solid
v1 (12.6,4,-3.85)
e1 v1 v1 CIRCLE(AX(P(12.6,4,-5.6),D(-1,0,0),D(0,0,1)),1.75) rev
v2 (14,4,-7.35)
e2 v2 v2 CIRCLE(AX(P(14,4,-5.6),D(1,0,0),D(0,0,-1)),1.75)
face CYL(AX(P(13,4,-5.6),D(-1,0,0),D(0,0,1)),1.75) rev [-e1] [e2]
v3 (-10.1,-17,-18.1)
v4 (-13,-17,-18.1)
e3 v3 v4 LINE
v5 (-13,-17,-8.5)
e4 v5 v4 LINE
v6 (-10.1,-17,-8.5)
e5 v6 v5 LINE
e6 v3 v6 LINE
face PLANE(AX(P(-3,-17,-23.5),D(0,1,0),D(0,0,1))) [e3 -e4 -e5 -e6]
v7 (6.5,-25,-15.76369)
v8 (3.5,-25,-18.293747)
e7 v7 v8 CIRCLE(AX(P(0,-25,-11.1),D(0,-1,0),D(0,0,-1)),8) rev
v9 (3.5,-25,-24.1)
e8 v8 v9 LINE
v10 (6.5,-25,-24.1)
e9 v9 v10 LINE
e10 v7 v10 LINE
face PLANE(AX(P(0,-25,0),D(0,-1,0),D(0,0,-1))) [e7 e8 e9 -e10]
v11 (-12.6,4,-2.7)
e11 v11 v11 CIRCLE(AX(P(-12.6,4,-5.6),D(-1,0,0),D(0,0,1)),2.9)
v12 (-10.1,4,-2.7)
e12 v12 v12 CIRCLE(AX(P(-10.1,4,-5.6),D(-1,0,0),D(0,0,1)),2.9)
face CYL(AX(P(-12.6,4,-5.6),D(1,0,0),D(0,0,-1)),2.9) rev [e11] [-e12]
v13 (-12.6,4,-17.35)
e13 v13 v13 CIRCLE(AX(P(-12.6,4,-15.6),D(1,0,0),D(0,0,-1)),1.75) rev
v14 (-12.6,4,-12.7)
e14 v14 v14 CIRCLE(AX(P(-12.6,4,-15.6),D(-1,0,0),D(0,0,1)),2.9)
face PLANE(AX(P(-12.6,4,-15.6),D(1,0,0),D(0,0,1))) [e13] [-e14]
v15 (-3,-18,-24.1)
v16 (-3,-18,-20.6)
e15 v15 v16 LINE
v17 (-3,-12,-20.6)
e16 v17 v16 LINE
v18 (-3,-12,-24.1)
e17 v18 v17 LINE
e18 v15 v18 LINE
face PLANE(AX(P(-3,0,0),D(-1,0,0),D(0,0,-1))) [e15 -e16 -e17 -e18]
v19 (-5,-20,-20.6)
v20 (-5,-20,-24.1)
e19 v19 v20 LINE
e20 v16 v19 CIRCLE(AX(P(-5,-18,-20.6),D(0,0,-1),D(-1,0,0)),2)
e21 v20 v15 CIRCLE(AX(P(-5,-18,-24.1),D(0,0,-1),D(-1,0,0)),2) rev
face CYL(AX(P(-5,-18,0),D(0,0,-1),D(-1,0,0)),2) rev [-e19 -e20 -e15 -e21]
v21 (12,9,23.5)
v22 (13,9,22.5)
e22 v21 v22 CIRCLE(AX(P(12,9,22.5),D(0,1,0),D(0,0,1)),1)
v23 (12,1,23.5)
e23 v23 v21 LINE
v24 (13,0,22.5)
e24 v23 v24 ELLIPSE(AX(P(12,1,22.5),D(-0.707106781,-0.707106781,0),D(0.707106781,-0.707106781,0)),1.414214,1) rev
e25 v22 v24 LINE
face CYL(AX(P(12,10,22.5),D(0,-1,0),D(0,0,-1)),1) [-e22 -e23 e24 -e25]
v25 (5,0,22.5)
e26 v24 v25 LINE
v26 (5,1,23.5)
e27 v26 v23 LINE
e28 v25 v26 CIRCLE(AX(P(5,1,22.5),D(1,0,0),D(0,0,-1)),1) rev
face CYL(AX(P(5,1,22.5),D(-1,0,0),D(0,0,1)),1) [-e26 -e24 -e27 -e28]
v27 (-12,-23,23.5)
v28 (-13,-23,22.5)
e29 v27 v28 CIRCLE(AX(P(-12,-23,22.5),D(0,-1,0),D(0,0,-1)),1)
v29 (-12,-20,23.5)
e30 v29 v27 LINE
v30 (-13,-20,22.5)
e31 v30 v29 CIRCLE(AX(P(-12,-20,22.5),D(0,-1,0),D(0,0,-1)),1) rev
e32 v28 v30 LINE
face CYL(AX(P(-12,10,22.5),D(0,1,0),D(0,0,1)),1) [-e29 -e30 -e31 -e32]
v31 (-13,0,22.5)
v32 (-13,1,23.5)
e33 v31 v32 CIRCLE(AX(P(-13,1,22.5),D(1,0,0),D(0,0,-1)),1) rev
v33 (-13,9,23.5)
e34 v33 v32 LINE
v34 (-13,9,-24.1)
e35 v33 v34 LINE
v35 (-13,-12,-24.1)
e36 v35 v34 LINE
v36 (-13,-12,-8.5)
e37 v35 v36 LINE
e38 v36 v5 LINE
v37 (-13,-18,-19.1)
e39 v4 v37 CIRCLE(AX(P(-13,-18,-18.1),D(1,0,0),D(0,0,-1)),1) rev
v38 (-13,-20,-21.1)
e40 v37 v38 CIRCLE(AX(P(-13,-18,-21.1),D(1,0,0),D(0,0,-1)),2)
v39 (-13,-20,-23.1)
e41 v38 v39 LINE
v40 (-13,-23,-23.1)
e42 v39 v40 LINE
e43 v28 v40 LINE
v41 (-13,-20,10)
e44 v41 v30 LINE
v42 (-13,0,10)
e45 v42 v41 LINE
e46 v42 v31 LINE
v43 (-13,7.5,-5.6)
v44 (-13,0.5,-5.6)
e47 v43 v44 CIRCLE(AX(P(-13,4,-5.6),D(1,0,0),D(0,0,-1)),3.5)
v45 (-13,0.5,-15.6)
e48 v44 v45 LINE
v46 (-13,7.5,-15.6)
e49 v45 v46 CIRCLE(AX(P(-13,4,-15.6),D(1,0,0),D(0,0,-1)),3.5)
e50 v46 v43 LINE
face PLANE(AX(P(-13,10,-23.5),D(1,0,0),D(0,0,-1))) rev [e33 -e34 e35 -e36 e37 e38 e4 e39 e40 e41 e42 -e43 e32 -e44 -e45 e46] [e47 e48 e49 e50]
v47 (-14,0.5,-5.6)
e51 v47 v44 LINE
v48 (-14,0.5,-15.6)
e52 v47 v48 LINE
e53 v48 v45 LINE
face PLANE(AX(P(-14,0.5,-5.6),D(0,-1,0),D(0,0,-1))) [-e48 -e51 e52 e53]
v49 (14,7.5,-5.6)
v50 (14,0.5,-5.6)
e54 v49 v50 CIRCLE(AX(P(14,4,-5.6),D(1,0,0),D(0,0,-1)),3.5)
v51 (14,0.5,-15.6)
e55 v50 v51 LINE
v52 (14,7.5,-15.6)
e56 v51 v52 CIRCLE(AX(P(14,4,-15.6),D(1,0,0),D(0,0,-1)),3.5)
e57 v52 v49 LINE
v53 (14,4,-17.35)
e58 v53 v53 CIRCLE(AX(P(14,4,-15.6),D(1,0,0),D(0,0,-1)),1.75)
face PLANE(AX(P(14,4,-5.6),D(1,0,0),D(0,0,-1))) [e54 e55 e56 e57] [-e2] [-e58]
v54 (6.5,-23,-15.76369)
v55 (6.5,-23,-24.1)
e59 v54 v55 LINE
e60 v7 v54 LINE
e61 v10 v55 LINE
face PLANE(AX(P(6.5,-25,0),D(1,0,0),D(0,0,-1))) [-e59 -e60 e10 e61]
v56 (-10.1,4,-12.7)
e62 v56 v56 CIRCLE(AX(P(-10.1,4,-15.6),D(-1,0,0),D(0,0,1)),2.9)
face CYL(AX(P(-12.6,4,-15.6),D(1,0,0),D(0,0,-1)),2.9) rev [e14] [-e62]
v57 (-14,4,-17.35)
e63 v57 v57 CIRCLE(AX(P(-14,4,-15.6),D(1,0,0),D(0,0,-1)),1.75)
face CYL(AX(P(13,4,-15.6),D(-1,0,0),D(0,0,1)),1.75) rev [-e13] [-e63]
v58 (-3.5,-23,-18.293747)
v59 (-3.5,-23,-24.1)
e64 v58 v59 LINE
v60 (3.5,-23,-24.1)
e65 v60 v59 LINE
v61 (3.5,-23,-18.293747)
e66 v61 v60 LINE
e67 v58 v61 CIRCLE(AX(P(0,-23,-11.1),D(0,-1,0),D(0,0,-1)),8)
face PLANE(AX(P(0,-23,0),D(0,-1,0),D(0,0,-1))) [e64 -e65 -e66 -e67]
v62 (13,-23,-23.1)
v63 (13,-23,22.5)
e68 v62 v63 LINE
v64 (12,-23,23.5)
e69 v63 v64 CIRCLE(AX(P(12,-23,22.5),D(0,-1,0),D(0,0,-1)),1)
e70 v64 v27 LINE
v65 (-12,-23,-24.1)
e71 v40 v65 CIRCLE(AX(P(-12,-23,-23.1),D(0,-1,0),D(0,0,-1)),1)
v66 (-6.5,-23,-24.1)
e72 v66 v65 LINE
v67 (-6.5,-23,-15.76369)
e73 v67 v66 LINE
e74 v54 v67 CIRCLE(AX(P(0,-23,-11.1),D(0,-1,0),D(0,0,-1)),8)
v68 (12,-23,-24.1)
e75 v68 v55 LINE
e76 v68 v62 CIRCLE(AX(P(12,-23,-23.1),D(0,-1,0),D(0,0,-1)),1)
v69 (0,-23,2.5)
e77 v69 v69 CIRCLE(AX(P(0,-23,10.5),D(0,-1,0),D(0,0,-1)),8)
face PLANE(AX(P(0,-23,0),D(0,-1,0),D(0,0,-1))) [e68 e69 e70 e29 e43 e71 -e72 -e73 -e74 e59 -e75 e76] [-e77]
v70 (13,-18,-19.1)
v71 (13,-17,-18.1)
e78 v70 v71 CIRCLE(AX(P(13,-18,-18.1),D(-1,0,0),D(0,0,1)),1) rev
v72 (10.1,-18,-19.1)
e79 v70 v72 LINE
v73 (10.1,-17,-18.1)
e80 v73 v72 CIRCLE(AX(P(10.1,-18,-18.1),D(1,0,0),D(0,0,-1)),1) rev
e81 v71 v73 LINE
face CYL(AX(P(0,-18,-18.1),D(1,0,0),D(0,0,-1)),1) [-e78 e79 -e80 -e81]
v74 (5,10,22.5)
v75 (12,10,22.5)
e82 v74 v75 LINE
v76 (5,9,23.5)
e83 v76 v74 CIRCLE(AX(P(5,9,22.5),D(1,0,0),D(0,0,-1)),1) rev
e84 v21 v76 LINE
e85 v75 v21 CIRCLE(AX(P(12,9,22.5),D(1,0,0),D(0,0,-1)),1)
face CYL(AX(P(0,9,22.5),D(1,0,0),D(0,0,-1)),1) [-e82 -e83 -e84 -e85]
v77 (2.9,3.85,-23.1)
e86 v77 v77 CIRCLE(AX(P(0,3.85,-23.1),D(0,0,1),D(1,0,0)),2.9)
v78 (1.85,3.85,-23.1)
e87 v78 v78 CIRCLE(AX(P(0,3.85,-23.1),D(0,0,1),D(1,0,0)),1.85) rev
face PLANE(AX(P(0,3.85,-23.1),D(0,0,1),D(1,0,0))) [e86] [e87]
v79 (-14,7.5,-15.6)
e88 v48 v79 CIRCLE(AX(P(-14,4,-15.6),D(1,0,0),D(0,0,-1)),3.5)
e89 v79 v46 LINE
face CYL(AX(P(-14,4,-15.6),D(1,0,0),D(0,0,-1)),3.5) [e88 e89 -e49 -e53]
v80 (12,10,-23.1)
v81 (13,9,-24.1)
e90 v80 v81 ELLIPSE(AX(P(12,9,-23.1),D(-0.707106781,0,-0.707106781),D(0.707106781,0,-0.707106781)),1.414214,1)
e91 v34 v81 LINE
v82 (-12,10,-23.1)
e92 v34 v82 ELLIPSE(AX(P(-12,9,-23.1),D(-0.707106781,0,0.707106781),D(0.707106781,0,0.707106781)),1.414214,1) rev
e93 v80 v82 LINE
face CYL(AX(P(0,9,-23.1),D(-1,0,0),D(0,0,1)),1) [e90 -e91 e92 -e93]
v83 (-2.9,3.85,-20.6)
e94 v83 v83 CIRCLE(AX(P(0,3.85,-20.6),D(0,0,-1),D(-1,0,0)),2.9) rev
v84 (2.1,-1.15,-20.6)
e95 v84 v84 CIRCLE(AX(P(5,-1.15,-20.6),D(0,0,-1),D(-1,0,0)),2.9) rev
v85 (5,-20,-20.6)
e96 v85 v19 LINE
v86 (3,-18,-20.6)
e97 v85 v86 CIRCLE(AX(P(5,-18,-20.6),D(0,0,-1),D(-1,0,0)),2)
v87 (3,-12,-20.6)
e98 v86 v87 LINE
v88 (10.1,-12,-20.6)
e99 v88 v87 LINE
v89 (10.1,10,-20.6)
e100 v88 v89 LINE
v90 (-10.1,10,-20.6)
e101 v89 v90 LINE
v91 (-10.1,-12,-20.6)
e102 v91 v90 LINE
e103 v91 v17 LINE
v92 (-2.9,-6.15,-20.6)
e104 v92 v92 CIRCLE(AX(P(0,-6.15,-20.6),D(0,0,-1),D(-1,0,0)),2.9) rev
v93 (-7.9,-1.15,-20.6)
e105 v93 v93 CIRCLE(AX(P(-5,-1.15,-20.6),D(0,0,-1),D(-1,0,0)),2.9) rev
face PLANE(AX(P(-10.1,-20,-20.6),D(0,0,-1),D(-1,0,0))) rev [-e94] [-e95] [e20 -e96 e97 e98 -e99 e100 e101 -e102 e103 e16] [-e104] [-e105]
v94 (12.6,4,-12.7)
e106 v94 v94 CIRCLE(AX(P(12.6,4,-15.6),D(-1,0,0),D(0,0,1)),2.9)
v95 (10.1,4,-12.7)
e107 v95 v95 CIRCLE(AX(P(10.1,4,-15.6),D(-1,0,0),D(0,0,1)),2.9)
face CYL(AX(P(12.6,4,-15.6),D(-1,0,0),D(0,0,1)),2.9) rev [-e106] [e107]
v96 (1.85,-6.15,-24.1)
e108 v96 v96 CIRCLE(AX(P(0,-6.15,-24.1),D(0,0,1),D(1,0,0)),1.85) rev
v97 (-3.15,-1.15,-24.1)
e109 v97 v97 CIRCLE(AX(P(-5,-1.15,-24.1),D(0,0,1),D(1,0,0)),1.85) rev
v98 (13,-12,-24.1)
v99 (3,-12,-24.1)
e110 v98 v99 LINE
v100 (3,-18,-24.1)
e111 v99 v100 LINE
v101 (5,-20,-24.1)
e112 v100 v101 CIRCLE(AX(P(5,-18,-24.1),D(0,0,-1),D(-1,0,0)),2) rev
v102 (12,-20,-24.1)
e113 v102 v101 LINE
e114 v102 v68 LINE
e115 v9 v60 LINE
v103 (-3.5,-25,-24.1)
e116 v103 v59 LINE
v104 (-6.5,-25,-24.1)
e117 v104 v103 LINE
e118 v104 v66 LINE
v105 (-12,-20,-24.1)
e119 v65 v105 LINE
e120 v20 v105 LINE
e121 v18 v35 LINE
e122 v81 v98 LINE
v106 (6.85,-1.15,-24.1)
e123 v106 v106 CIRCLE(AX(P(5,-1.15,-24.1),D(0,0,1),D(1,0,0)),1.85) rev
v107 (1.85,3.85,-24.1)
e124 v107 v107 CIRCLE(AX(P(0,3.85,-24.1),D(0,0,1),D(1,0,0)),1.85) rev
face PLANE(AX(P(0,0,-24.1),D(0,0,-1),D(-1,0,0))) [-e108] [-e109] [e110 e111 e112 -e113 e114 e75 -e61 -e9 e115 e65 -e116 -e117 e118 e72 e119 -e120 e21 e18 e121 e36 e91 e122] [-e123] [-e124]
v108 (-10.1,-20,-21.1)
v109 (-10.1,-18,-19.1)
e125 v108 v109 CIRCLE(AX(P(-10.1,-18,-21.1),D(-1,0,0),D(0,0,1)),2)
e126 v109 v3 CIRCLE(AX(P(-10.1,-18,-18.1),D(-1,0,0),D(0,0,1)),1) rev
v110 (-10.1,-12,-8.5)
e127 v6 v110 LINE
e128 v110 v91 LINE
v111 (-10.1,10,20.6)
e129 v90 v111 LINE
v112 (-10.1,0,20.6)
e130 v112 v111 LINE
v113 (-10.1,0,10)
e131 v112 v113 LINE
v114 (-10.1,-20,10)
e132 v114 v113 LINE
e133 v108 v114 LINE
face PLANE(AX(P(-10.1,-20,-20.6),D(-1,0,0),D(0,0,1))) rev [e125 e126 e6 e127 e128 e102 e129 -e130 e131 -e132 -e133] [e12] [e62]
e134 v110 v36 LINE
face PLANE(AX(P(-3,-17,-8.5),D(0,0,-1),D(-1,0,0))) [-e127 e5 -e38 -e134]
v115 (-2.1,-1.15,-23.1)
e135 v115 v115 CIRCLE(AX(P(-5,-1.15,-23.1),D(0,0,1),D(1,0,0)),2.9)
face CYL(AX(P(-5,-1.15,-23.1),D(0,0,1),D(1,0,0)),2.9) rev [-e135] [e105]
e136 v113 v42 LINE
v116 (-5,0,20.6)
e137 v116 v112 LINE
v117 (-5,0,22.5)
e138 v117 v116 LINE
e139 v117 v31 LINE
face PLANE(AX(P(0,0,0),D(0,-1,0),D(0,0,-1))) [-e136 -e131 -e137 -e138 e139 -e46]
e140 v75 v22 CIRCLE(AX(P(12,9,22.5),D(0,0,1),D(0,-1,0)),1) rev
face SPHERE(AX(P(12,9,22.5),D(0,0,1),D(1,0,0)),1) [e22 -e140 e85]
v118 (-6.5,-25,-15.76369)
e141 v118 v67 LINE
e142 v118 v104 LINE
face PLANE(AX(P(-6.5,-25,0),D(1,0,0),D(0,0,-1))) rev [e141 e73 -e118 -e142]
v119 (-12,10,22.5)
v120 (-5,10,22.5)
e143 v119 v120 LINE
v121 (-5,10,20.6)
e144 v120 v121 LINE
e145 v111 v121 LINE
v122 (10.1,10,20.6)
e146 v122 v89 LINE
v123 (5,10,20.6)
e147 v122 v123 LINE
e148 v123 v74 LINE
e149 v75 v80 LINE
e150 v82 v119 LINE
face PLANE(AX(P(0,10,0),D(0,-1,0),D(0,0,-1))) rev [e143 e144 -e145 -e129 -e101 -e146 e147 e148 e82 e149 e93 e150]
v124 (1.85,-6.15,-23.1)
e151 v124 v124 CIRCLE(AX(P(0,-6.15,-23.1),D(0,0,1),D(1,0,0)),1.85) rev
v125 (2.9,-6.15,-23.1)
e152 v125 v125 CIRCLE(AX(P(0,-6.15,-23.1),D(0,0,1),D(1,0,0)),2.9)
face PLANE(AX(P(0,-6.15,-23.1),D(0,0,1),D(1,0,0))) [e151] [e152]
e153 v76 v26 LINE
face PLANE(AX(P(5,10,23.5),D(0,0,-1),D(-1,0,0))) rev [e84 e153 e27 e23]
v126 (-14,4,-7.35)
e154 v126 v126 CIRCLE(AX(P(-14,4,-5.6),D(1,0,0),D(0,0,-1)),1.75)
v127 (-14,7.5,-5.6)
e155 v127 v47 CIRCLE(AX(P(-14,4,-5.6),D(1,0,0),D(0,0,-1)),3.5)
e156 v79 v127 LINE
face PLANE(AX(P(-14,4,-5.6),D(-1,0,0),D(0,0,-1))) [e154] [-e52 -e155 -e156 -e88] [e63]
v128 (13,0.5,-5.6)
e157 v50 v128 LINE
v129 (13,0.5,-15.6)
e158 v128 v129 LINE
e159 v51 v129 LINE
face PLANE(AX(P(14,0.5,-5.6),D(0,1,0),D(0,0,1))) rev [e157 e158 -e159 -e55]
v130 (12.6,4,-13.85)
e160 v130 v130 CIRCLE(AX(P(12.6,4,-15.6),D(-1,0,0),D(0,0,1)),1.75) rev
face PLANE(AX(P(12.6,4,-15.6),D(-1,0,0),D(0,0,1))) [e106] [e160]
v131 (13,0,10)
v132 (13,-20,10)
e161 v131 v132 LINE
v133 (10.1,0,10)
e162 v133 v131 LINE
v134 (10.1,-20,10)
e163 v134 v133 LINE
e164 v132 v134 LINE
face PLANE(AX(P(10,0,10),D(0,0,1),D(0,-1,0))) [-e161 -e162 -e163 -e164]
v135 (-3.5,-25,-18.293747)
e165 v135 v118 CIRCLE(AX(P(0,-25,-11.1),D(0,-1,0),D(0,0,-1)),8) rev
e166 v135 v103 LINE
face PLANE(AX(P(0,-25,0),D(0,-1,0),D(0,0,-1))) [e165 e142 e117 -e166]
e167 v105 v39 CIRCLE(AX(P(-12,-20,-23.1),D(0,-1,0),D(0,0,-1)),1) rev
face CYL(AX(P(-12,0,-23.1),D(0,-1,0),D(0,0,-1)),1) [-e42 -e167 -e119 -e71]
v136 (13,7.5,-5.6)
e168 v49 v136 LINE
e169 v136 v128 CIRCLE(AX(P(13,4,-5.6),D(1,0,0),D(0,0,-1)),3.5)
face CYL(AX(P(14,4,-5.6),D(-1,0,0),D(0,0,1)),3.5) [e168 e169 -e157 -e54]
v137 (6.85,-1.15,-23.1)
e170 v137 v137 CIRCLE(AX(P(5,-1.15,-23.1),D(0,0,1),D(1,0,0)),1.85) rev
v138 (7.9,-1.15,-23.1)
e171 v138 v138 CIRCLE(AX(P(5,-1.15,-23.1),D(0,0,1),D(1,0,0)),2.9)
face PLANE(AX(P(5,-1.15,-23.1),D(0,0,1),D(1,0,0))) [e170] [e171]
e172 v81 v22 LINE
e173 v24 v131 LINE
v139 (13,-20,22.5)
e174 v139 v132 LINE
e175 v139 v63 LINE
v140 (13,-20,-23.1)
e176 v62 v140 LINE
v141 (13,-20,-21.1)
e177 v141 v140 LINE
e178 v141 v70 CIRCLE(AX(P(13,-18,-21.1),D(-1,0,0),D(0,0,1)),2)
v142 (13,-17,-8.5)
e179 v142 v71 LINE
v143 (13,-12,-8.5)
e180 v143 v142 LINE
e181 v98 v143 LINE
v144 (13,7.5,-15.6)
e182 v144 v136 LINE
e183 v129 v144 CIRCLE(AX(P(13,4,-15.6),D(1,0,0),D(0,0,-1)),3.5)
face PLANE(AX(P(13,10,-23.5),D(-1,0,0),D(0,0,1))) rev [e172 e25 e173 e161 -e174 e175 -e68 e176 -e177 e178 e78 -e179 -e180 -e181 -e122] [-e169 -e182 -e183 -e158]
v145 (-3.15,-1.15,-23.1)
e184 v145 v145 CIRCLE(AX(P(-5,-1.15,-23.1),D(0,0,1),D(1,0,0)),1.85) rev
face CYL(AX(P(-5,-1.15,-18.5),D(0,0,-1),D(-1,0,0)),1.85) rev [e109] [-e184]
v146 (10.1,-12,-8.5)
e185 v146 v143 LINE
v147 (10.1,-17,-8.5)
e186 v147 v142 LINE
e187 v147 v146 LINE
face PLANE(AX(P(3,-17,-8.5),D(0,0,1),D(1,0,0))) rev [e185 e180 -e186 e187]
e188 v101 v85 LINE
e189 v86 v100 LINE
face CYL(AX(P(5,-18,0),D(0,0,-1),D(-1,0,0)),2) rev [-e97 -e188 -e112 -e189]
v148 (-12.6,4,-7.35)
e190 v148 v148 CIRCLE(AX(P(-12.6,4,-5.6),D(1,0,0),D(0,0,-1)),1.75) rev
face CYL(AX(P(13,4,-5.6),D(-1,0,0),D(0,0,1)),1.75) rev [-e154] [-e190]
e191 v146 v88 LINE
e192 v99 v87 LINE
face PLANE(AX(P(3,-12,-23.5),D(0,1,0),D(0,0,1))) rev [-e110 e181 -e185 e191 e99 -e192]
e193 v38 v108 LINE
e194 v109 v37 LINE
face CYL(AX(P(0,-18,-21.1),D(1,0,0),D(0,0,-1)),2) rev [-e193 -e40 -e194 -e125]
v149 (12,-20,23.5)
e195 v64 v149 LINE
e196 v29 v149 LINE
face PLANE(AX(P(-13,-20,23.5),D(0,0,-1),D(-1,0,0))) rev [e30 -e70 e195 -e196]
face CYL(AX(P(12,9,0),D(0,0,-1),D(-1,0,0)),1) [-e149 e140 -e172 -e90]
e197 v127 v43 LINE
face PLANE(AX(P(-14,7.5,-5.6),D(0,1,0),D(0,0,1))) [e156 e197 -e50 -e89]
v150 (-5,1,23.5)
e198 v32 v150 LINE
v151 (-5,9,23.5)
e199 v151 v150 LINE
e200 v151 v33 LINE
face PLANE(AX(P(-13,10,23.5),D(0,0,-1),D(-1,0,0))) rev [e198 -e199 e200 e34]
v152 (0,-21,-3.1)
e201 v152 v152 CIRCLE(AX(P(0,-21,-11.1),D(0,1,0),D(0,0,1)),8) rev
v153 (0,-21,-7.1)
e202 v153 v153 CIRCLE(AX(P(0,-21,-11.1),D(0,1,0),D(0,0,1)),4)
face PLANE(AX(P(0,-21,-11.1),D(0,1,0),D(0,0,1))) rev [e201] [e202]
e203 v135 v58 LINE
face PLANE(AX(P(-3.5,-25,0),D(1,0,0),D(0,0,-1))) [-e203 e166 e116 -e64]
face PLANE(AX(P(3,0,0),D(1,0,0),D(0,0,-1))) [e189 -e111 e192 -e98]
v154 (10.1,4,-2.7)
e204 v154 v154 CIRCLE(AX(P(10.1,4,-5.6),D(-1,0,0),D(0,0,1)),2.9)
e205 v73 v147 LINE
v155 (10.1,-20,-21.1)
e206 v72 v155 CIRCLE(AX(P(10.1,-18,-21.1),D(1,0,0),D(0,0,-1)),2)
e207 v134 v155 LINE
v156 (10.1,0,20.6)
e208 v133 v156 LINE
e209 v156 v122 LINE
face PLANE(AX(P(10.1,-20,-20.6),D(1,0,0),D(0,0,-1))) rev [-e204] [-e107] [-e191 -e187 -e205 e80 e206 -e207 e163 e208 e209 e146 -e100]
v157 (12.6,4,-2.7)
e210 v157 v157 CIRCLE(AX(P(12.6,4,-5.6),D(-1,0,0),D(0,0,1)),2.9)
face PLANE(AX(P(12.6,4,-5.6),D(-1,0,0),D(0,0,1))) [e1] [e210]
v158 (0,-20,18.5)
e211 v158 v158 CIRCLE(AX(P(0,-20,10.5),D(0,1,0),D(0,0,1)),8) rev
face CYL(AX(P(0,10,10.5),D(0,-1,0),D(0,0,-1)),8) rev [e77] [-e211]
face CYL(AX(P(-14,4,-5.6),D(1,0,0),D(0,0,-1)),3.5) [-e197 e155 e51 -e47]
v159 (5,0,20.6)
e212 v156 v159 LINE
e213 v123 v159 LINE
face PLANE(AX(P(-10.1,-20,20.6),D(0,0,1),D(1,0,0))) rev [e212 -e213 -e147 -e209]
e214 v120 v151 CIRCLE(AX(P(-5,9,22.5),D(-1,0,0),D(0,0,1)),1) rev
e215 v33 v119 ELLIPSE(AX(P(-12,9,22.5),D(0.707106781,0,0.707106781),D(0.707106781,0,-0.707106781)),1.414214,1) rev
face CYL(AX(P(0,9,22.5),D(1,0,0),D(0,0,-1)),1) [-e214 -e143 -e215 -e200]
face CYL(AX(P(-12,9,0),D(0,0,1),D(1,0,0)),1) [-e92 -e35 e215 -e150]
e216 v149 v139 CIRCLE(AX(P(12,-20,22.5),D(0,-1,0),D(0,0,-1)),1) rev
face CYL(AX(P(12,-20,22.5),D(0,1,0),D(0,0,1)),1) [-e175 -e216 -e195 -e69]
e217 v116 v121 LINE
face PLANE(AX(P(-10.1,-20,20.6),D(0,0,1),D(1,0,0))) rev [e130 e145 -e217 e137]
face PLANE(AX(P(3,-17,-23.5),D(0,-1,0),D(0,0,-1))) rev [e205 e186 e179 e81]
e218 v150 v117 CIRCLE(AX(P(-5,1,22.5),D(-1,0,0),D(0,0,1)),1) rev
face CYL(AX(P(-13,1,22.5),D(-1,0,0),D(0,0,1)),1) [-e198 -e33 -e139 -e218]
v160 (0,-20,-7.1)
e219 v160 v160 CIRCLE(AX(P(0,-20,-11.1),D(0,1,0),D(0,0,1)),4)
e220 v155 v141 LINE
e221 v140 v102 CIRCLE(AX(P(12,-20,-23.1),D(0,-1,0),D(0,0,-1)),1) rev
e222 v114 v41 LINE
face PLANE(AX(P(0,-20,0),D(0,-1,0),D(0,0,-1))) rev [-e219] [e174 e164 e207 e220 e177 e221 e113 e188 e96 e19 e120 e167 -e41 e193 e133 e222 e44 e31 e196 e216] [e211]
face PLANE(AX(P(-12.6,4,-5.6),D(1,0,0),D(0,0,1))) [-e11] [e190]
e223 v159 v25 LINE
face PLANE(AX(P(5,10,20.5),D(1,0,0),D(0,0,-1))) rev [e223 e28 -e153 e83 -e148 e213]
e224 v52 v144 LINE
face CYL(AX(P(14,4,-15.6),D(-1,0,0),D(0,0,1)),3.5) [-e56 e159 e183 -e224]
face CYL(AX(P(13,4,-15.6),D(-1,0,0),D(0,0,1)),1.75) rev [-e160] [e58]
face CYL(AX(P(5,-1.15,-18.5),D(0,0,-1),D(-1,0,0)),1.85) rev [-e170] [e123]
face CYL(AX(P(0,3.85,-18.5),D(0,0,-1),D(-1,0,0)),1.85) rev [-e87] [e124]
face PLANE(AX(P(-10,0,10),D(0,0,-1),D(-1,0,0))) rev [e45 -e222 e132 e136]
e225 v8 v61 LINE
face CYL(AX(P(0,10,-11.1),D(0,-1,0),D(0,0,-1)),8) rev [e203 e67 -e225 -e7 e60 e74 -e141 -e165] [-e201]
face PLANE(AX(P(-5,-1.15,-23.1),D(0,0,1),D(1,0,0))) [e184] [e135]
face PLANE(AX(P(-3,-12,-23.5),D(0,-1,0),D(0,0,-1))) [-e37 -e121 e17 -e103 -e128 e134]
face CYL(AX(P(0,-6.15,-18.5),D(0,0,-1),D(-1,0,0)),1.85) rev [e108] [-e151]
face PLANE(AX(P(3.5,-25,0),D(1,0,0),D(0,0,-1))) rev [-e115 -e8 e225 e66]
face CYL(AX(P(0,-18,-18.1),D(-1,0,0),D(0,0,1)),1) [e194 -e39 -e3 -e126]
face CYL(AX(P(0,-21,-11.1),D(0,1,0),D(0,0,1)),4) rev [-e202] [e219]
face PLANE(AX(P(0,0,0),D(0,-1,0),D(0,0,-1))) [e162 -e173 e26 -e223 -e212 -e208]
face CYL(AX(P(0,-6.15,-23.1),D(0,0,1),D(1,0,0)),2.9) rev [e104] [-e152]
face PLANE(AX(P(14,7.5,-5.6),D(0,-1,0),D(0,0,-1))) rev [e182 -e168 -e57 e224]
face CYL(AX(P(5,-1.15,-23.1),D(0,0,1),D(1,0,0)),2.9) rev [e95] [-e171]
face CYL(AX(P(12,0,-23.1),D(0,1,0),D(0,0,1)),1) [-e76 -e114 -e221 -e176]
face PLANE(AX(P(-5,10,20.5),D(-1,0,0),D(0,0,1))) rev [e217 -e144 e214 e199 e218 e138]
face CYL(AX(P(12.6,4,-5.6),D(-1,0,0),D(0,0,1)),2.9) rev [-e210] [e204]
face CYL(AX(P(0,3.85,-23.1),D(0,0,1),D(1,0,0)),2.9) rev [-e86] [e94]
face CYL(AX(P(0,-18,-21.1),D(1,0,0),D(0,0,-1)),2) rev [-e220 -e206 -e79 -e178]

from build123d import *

# Parameters (mm, degrees)
BOSS_EXTRUDE1_DEPTH      = 10
SKETCH2_W                = 20
SKETCH2_H                = 17
BOSS_EXTRUDE2_DEPTH      = 3
SKETCH3_W                = 26
SKETCH3_H                = 47
BOSS_EXTRUDE3_DEPTH      = 3
SKETCH5_R                = 8
SKETCH5_W                = 16
SKETCH5_H                = 4
CUT_EXTRUDE1_DEPTH       = 41.264748851
BOSS_EXTRUDE4_DEPTH      = 26
SKETCH7_W                = 20
SKETCH7_H                = 10.5
CUT_EXTRUDE2_DEPTH       = 10
SKETCH9_W                = 8
SKETCH9_H                = 6
CUT_EXTRUDE3_DEPTH       = 10
SKETCH10_W               = 30
SKETCH10_H               = 30
BOSS_EXTRUDE5_DEPTH      = 3
SKETCH11_R               = 1.75
CUT_EXTRUDE4_DEPTH       = 5
BOSS_EXTRUDE6_START      = 3
SKETCH12_W               = 26
SKETCH12_H               = 47
SKETCH12_R               = 8
BOSS_EXTRUDE6_DEPTH      = 3
CUT_EXTRUDE5_START       = -3
SKETCH14_R               = 8
SKETCH14_W               = 16
SKETCH14_H               = 4
CUT_EXTRUDE5_DEPTH       = 3
CUT_EXTRUDE7_DEPTH       = 49.674942219
CUT_EXTRUDE7_DEPTH_BACK  = 49.674942219
BOSS_EXTRUDE7_DEPTH      = 10.7
SKETCH18_W               = 15
SKETCH18_H               = 5
CUT_EXTRUDE8_DEPTH       = 10
SKETCH21_R               = 1.85
CUT_EXTRUDE9_DEPTH       = 5
SKETCH22_R               = 2.9
CUT_EXTRUDE10_DEPTH      = 2.6
BOSS_EXTRUDE11_OUTLINE_R = 1.85
BOSS_EXTRUDE11_DEPTH     = 0.6
SKETCH24_R               = 1.85
BOSS_EXTRUDE12_DEPTH     = 4
SKETCH25_W               = 7
SKETCH25_H               = 3
CUT_EXTRUDE11_DEPTH      = 5
SKETCH26_W               = 20.2
SKETCH26_H               = 41.2
CUT_EXTRUDE12_DEPTH      = 30
SKETCH27_W               = 0.1
SKETCH27_H               = 3
CUT_EXTRUDE13_DEPTH      = 55.440426156
SKETCH28_R               = 8
CUT_EXTRUDE14_DEPTH      = 46.250524859
SKETCH29_W               = 2.9
SKETCH29_H               = 3
CUT_EXTRUDE15_DEPTH      = 5
FILLET1_R                = 2
FILLET2_R                = 2
FILLET3_R                = 1
SKETCH30_W               = 4.827498142
SKETCH30_H               = 18.818593056
CUT_EXTRUDE16_DEPTH      = 45.661056862
SKETCH31_R               = 1.75
CUT_EXTRUDE17_DEPTH      = 43.258845228
SKETCH32_R               = 2.9
CUT_EXTRUDE18_DEPTH      = 2.5
SKETCH33_R               = 1.75
BOSS_EXTRUDE13_DEPTH     = 1
BOSS_EXTRUDE14_START     = -1
SKETCH34_R               = 8
SKETCH34_R_2             = 4
BOSS_EXTRUDE14_DEPTH     = 1
BOSS_EXTRUDE15_START     = 2
BOSS_EXTRUDE15_DEPTH     = 2


# Read off the part's stored shape, not the designer's step: Boss-Extrude11
with BuildPart() as part:
    # Sketch1 → Boss-Extrude1 (new body)
    with BuildSketch(Plane(origin=(0, 0, 0), x_dir=(1, 0, 0), z_dir=(0, 1, 0))):
        Polygon((5, -23.5), (13, -23.5), (13, 23.5), (-13, 23.5), (-13, -23.5), (-5, -23.5), (-5, -20.5), (-10, -20.5), (-10, 20.5), (10, 20.5), (10, -20.5), (5, -20.5), align=None)
    extrude(amount=BOSS_EXTRUDE1_DEPTH)

    # Sketch2 → Boss-Extrude2 (add)
    with BuildSketch(Plane(origin=(13, 0, 0), x_dir=(0, 0, -1), z_dir=(1, 0, 0))):
        with Locations((0, -8.5)):
            Rectangle(SKETCH2_W, SKETCH2_H)
    boss_extrude2 = extrude(amount=-BOSS_EXTRUDE2_DEPTH)

    # Mirror1: Boss-Extrude2 across plane
    add(boss_extrude2.mirror(Plane(origin=(0, 0, 0), x_dir=(0, 0, 1), z_dir=(1, 0, 0))))

    # Sketch3 → Boss-Extrude3 (add)
    with BuildSketch(Plane.XZ.offset(17)):
        Rectangle(SKETCH3_W, SKETCH3_H)
    extrude(amount=BOSS_EXTRUDE3_DEPTH)

    # Sketch5 → Cut-Extrude1 (cut, through all)
    with BuildSketch(Plane.XZ.offset(20)):
        with Locations(Location((0, 10.5, 0), (0, 0, 270))):
            Circle(SKETCH5_R)
        with Locations((0, -6.5)):
            Rectangle(SKETCH5_W, SKETCH5_H)
        with Locations((0, -14.5)):
            Rectangle(SKETCH5_W, SKETCH5_H)
    extrude(amount=-CUT_EXTRUDE1_DEPTH, mode=Mode.SUBTRACT)

    # Sketch6 → Boss-Extrude4 (add)
    with BuildSketch(Plane(origin=(13, 0, 0), x_dir=(0, 0, -1), z_dir=(1, 0, 0))):
        Polygon((29.5, 4.35), (23.5, 4.35), (23.5, 0), (23.5, -3.65), (29.5, -3.65), align=None)
        Polygon((23.5, -3.65), (23.5, 0), (10, 0), (10, -9.3), (23.5, -9.3), align=None)
    extrude(amount=-BOSS_EXTRUDE4_DEPTH)

    # Sketch7 → Cut-Extrude2 (cut)
    with BuildSketch(Plane(origin=(0, 0, 0), x_dir=(1, 0, 0), z_dir=(0, 1, 0))):
        with Locations((0, 15.25)):
            Rectangle(SKETCH7_W, SKETCH7_H)
    extrude(amount=-CUT_EXTRUDE2_DEPTH, mode=Mode.SUBTRACT)

    # Sketch9 → Cut-Extrude3 (cut)
    with BuildSketch(Plane(origin=(0, 4.35, 0), x_dir=(1, 0, 0), z_dir=(0, 1, 0))):
        with Locations((-9, 26.5)):
            Rectangle(SKETCH9_W, SKETCH9_H)
        with Locations((9, 26.5)):
            Rectangle(SKETCH9_W, SKETCH9_H)
    extrude(amount=-CUT_EXTRUDE3_DEPTH, mode=Mode.SUBTRACT)

    # Sketch10 → Boss-Extrude5 (add)
    with BuildSketch(Plane(origin=(0, 0, -29.5), x_dir=(-1, 0, 0), z_dir=(0, 0, -1))):
        Rectangle(SKETCH10_W, SKETCH10_H)
    extrude(amount=BOSS_EXTRUDE5_DEPTH)

    # Sketch11 → Cut-Extrude4 (cut)
    with BuildSketch(Plane(origin=(0, 0, -32.5), x_dir=(-1, 0, 0), z_dir=(0, 0, -1))):
        with Locations((0, 10)):
            Circle(SKETCH11_R)
        with Locations((10, 0)):
            Circle(SKETCH11_R)
        with Locations((0, -10)):
            Circle(SKETCH11_R)
        with Locations((-10, 0)):
            Circle(SKETCH11_R)
    extrude(amount=-CUT_EXTRUDE4_DEPTH, mode=Mode.SUBTRACT)

    # Sketch12 → Boss-Extrude6 (add)
    with BuildSketch(Plane.XZ.offset(20).offset(BOSS_EXTRUDE6_START)):
        Rectangle(SKETCH12_W, SKETCH12_H)
        with Locations(Location((0, 10.5, 0), (0, 0, 270))):
            Circle(SKETCH12_R, mode=Mode.SUBTRACT)
    extrude(amount=-BOSS_EXTRUDE6_DEPTH)

    # Sketch14 → Cut-Extrude5 (cut)
    with BuildSketch(Plane(origin=(0, -17, 0), x_dir=(1, 0, 0), z_dir=(0, 1, 0)).offset(CUT_EXTRUDE5_START)):
        Polygon((13, -23.5), (13, -10), (10, -10), (10, 10), (13, 10), (13, 23.5), (-13, 23.5), (-13, 10), (-10, 10), (-10, -10), (-13, -10), (-13, -23.5), align=None)
        with Locations(Location((0, -10.5, 0), (0, 0, 90))):
            Circle(SKETCH14_R, mode=Mode.SUBTRACT)
        with Locations((0, 6.5)):
            Rectangle(SKETCH14_W, SKETCH14_H, mode=Mode.SUBTRACT)
        with Locations((0, 14.5)):
            Rectangle(SKETCH14_W, SKETCH14_H, mode=Mode.SUBTRACT)
    extrude(amount=CUT_EXTRUDE5_DEPTH, mode=Mode.SUBTRACT)

    # Sketch15 → Cut-Extrude7 (cut, two sides: drawn at the far end of the back side and taken through both)
    with BuildSketch(Plane(origin=(13, 0, 0), x_dir=(0, 0, -1), z_dir=(1, 0, 0)).offset(-CUT_EXTRUDE7_DEPTH_BACK)):
        Polygon((23.5, -9.3), (23.5, -15.243835525), (32.5, -15.243835525), (32.5, 15), (23.5, 15), (23.5, 10), align=None)
    extrude(amount=CUT_EXTRUDE7_DEPTH + CUT_EXTRUDE7_DEPTH_BACK, mode=Mode.SUBTRACT)

    # Sketch16 → Boss-Extrude7 (add)
    with BuildSketch(Plane.XZ.offset(9.3)):
        Polygon((10, -10), (10, -20.5), (-10, -20.5), (-10, -10), (-13, -10), (-13, -23.5), (13, -23.5), (13, -10), align=None)
    extrude(amount=BOSS_EXTRUDE7_DEPTH)

    # Sketch18 → Cut-Extrude8 (cut)
    with BuildSketch(Plane(origin=(13, 0, 0), x_dir=(0, 0, -1), z_dir=(1, 0, 0))):
        with Locations((16, -14.5)):
            Rectangle(SKETCH18_W, SKETCH18_H)
    cut_extrude8 = extrude(amount=-CUT_EXTRUDE8_DEPTH, mode=Mode.SUBTRACT)

    # Mirror2: Cut-Extrude8 across plane
    add(cut_extrude8.mirror(Plane(origin=(0, 0, 0), x_dir=(0, 0, 1), z_dir=(1, 0, 0))), mode=Mode.SUBTRACT)

    # Sketch21 → Cut-Extrude9 (cut)
    with BuildSketch(Plane(origin=(0, 0, -23.5), x_dir=(-1, 0, 0), z_dir=(0, 0, -1))):
        with Locations((-5, -1.15)):
            Circle(SKETCH21_R)
        with Locations((0, 3.85)):
            Circle(SKETCH21_R)
        with Locations((5, -1.15)):
            Circle(SKETCH21_R)
        with Locations((0, -6.15)):
            Circle(SKETCH21_R)
    extrude(amount=-CUT_EXTRUDE9_DEPTH, mode=Mode.SUBTRACT)

    # Sketch22 → Cut-Extrude10 (cut)
    with BuildSketch(Plane.XY.offset(-20.5)):
        with Locations((0, 3.85)):
            Circle(SKETCH22_R)
        with Locations((5, -1.15)):
            Circle(SKETCH22_R)
        with Locations((0, -6.15)):
            Circle(SKETCH22_R)
        with Locations((-5, -1.15)):
            Circle(SKETCH22_R)
    extrude(amount=-CUT_EXTRUDE10_DEPTH, mode=Mode.SUBTRACT)

    # Boss-Extrude11 outline → Boss-Extrude11 (add)
    with BuildSketch(Plane(origin=(0, 0, -23.5), x_dir=(-1, 0, 0), z_dir=(0, 0, -1))):
        Polygon((-13, -12), (-3, -12), (-3, -17), (-13, -17), (-13, -23), (13, -23), (13, -17), (3, -17), (3, -12), (13, -12), (13, 10), (-13, 10), align=None)
        with Locations((-5, -1.15)):
            Circle(BOSS_EXTRUDE11_OUTLINE_R, mode=Mode.SUBTRACT)
        with Locations((0, -6.15)):
            Circle(BOSS_EXTRUDE11_OUTLINE_R, mode=Mode.SUBTRACT)
        with Locations((5, -1.15)):
            Circle(BOSS_EXTRUDE11_OUTLINE_R, mode=Mode.SUBTRACT)
        with Locations((0, 3.85)):
            Circle(BOSS_EXTRUDE11_OUTLINE_R, mode=Mode.SUBTRACT)
    extrude(amount=BOSS_EXTRUDE11_DEPTH)

    # Sketch24 → Boss-Extrude12 (add)
    with BuildSketch(Plane(origin=(0, 0, -24.1), x_dir=(-1, 0, 0), z_dir=(0, 0, -1))):
        with BuildLine():
            ThreePointArc((-7.5, 3.35), (-6.621320344, 5.471320344), (-4.5, 6.35))
            Line((-4.5, 6.35), (4.5, 6.35))
            ThreePointArc((4.5, 6.35), (6.621320344, 5.471320344), (7.5, 3.35))
            Line((7.5, 3.35), (7.5, -5.65))
            ThreePointArc((7.5, -5.65), (6.621320344, -7.771320344), (4.5, -8.65))
            Line((4.5, -8.65), (-4.5, -8.65))
            ThreePointArc((-4.5, -8.65), (-6.621320344, -7.771320344), (-7.5, -5.65))
            Line((-7.5, -5.65), (-7.5, 3.35))
        make_face()
        with Locations((0, -6.15)):
            Circle(SKETCH24_R, mode=Mode.SUBTRACT)
        with Locations((5, -1.15)):
            Circle(SKETCH24_R, mode=Mode.SUBTRACT)
        with Locations((-5, -1.15)):
            Circle(SKETCH24_R, mode=Mode.SUBTRACT)
        with Locations((0, 3.85)):
            Circle(SKETCH24_R, mode=Mode.SUBTRACT)
    extrude(amount=BOSS_EXTRUDE12_DEPTH)

    # Sketch25 → Cut-Extrude11 (cut)
    with BuildSketch(Plane(origin=(0, 0, -24.1), x_dir=(-1, 0, 0), z_dir=(0, 0, -1))):
        with Locations((-6.5, -18.5)):
            Rectangle(SKETCH25_W, SKETCH25_H)
        with Locations((6.5, -18.5)):
            Rectangle(SKETCH25_W, SKETCH25_H)
    extrude(amount=-CUT_EXTRUDE11_DEPTH, mode=Mode.SUBTRACT)

    # Sketch26 → Cut-Extrude12 (cut)
    with BuildSketch(Plane(origin=(0, 10, 0), x_dir=(1, 0, 0), z_dir=(0, 1, 0))):
        Rectangle(SKETCH26_W, SKETCH26_H)
    extrude(amount=-CUT_EXTRUDE12_DEPTH, mode=Mode.SUBTRACT)

    # Sketch27 → Cut-Extrude13 (cut, through all)
    with BuildSketch(Plane(origin=(0, 0, -24.1), x_dir=(-1, 0, 0), z_dir=(0, 0, -1))):
        with Locations((-10.05, -18.5)):
            Rectangle(SKETCH27_W, SKETCH27_H)
        with Locations((10.05, -18.5)):
            Rectangle(SKETCH27_W, SKETCH27_H)
    extrude(amount=-CUT_EXTRUDE13_DEPTH, mode=Mode.SUBTRACT)

    # Sketch28 → Cut-Extrude14 (cut, through all)
    with BuildSketch(Plane.XZ.offset(23)):
        with Locations(Location((0, -11.1, 0), (0, 0, 270))):
            Circle(SKETCH28_R)
    extrude(amount=-CUT_EXTRUDE14_DEPTH, mode=Mode.SUBTRACT)

    # Sketch29 → Cut-Extrude15 (cut)
    with BuildSketch(Plane(origin=(0, 0, -24.1), x_dir=(-1, 0, 0), z_dir=(0, 0, -1))):
        with Locations((-11.55, -18.5)):
            Rectangle(SKETCH29_W, SKETCH29_H)
        with Locations((11.55, -18.5)):
            Rectangle(SKETCH29_W, SKETCH29_H)
    extrude(amount=-CUT_EXTRUDE15_DEPTH, mode=Mode.SUBTRACT)

    # Fillet1
    fillet1_edges = [part.edges().sort_by_distance(p)[0] for p in [
        (-3, -20, -22.35),
        (3, -20, -22.35),
    ]]
    fillet(fillet1_edges, radius=FILLET1_R)

    # Fillet2
    fillet2_edges = [part.edges().sort_by_distance(p)[0] for p in [
        (11.55, -20, -19.1),
        (-11.55, -20, -19.1),
    ]]
    fillet(fillet2_edges, radius=FILLET2_R)

    # Fillet3
    fillet3_edges = [part.edges().sort_by_distance(p)[0] for p in [
        (11.55, -17, -19.1),
        (-11.55, -17, -19.1),
        (-9, 10, 23.5),
        (-13, 10, -0.3),
        (0, 10, -24.1),
        (13, 10, -0.3),
        (9, 10, 23.5),
        (13, 5, 23.5),
        (9, 0, 23.5),
        (-9, 0, 23.5),
        (13, -21.5, -24.1),
        (-13, -21.5, -24.1),
        (-13, -21.5, 23.5),
        (13, -21.5, 23.5),
    ]]
    fillet(fillet3_edges, radius=FILLET3_R - 0.0001)  # a hair under: the kernel refuses the full size

    # Sketch30 → Cut-Extrude16 (cut, through all)
    with BuildSketch(Plane.ZY.offset(13)):
        with Locations((-26.513749071, -1.642619156)):
            Rectangle(SKETCH30_W, SKETCH30_H)
    extrude(amount=-CUT_EXTRUDE16_DEPTH, mode=Mode.SUBTRACT)

    # Sketch31 → Cut-Extrude17 (cut, through all)
    with BuildSketch(Plane.ZY.offset(13)):
        with Locations((-15.6, 4)):
            Circle(SKETCH31_R)
        with Locations((-5.6, 4)):
            Circle(SKETCH31_R)
    extrude(amount=-CUT_EXTRUDE17_DEPTH, mode=Mode.SUBTRACT)

    # Sketch32 → Cut-Extrude18 (cut)
    with BuildSketch(Plane.ZY.offset(-10.1)):
        with Locations((-15.6, 4)):
            Circle(SKETCH32_R)
        with Locations((-5.6, 4)):
            Circle(SKETCH32_R)
    cut_extrude18 = extrude(amount=-CUT_EXTRUDE18_DEPTH, mode=Mode.SUBTRACT)

    # Sketch33 → Boss-Extrude13 (add)
    with BuildSketch(Plane(origin=(13, 0, 0), x_dir=(0, 0, -1), z_dir=(1, 0, 0))):
        with BuildLine():
            Line((5.6, 7.5), (15.6, 7.5))
            ThreePointArc((15.6, 7.5), (19.1, 4), (15.6, 0.5))
            Line((15.6, 0.5), (5.6, 0.5))
            ThreePointArc((5.6, 0.5), (2.1, 4), (5.6, 7.5))
        make_face()
        with Locations(Location((5.6, 4, 0), (0, 0, 180))):
            Circle(SKETCH33_R, mode=Mode.SUBTRACT)
        with Locations(Location((15.6, 4, 0), (0, 0, 180))):
            Circle(SKETCH33_R, mode=Mode.SUBTRACT)
    boss_extrude13 = extrude(amount=BOSS_EXTRUDE13_DEPTH)

    # Mirror3: Boss-Extrude13 across plane
    add(boss_extrude13.mirror(Plane(origin=(0, 0, 0), x_dir=(0, 0, 1), z_dir=(1, 0, 0))))

    # Mirror4: Cut-Extrude18 across plane
    add(cut_extrude18.mirror(Plane(origin=(0, 0, 0), x_dir=(0, 0, 1), z_dir=(1, 0, 0))), mode=Mode.SUBTRACT)

    # Sketch34 → Boss-Extrude14 (add)
    with BuildSketch(Plane(origin=(0, -20, 0), x_dir=(1, 0, 0), z_dir=(0, 1, 0)).offset(BOSS_EXTRUDE14_START)):
        with Locations(Location((0, 11.1, 0), (0, 0, 90))):
            Circle(SKETCH34_R)
        with Locations(Location((0, 11.1, 0), (0, 0, 270))):
            Circle(SKETCH34_R_2, mode=Mode.SUBTRACT)
    extrude(amount=BOSS_EXTRUDE14_DEPTH)

    # Sketch35 → Boss-Extrude15 (add)
    with BuildSketch(Plane.XZ.offset(23).offset(BOSS_EXTRUDE15_START)):
        with BuildLine():
            ThreePointArc((6.5, -15.763689527), (5.157547679, -17.215529571), (3.5, -18.293747285))
            Line((3.5, -18.293747285), (3.5, -24.1))
            Line((3.5, -24.1), (6.5, -24.1))
            Line((6.5, -24.1), (6.5, -15.763689527))
        make_face()
        with BuildLine():
            Line((-3.5, -24.1), (-3.5, -18.293747285))
            ThreePointArc((-3.5, -18.293747285), (-5.157547679, -17.215529571), (-6.5, -15.763689527))
            Line((-6.5, -15.763689527), (-6.5, -24.1))
            Line((-6.5, -24.1), (-3.5, -24.1))
        make_face()
    extrude(amount=-BOSS_EXTRUDE15_DEPTH)


solid = part.part
